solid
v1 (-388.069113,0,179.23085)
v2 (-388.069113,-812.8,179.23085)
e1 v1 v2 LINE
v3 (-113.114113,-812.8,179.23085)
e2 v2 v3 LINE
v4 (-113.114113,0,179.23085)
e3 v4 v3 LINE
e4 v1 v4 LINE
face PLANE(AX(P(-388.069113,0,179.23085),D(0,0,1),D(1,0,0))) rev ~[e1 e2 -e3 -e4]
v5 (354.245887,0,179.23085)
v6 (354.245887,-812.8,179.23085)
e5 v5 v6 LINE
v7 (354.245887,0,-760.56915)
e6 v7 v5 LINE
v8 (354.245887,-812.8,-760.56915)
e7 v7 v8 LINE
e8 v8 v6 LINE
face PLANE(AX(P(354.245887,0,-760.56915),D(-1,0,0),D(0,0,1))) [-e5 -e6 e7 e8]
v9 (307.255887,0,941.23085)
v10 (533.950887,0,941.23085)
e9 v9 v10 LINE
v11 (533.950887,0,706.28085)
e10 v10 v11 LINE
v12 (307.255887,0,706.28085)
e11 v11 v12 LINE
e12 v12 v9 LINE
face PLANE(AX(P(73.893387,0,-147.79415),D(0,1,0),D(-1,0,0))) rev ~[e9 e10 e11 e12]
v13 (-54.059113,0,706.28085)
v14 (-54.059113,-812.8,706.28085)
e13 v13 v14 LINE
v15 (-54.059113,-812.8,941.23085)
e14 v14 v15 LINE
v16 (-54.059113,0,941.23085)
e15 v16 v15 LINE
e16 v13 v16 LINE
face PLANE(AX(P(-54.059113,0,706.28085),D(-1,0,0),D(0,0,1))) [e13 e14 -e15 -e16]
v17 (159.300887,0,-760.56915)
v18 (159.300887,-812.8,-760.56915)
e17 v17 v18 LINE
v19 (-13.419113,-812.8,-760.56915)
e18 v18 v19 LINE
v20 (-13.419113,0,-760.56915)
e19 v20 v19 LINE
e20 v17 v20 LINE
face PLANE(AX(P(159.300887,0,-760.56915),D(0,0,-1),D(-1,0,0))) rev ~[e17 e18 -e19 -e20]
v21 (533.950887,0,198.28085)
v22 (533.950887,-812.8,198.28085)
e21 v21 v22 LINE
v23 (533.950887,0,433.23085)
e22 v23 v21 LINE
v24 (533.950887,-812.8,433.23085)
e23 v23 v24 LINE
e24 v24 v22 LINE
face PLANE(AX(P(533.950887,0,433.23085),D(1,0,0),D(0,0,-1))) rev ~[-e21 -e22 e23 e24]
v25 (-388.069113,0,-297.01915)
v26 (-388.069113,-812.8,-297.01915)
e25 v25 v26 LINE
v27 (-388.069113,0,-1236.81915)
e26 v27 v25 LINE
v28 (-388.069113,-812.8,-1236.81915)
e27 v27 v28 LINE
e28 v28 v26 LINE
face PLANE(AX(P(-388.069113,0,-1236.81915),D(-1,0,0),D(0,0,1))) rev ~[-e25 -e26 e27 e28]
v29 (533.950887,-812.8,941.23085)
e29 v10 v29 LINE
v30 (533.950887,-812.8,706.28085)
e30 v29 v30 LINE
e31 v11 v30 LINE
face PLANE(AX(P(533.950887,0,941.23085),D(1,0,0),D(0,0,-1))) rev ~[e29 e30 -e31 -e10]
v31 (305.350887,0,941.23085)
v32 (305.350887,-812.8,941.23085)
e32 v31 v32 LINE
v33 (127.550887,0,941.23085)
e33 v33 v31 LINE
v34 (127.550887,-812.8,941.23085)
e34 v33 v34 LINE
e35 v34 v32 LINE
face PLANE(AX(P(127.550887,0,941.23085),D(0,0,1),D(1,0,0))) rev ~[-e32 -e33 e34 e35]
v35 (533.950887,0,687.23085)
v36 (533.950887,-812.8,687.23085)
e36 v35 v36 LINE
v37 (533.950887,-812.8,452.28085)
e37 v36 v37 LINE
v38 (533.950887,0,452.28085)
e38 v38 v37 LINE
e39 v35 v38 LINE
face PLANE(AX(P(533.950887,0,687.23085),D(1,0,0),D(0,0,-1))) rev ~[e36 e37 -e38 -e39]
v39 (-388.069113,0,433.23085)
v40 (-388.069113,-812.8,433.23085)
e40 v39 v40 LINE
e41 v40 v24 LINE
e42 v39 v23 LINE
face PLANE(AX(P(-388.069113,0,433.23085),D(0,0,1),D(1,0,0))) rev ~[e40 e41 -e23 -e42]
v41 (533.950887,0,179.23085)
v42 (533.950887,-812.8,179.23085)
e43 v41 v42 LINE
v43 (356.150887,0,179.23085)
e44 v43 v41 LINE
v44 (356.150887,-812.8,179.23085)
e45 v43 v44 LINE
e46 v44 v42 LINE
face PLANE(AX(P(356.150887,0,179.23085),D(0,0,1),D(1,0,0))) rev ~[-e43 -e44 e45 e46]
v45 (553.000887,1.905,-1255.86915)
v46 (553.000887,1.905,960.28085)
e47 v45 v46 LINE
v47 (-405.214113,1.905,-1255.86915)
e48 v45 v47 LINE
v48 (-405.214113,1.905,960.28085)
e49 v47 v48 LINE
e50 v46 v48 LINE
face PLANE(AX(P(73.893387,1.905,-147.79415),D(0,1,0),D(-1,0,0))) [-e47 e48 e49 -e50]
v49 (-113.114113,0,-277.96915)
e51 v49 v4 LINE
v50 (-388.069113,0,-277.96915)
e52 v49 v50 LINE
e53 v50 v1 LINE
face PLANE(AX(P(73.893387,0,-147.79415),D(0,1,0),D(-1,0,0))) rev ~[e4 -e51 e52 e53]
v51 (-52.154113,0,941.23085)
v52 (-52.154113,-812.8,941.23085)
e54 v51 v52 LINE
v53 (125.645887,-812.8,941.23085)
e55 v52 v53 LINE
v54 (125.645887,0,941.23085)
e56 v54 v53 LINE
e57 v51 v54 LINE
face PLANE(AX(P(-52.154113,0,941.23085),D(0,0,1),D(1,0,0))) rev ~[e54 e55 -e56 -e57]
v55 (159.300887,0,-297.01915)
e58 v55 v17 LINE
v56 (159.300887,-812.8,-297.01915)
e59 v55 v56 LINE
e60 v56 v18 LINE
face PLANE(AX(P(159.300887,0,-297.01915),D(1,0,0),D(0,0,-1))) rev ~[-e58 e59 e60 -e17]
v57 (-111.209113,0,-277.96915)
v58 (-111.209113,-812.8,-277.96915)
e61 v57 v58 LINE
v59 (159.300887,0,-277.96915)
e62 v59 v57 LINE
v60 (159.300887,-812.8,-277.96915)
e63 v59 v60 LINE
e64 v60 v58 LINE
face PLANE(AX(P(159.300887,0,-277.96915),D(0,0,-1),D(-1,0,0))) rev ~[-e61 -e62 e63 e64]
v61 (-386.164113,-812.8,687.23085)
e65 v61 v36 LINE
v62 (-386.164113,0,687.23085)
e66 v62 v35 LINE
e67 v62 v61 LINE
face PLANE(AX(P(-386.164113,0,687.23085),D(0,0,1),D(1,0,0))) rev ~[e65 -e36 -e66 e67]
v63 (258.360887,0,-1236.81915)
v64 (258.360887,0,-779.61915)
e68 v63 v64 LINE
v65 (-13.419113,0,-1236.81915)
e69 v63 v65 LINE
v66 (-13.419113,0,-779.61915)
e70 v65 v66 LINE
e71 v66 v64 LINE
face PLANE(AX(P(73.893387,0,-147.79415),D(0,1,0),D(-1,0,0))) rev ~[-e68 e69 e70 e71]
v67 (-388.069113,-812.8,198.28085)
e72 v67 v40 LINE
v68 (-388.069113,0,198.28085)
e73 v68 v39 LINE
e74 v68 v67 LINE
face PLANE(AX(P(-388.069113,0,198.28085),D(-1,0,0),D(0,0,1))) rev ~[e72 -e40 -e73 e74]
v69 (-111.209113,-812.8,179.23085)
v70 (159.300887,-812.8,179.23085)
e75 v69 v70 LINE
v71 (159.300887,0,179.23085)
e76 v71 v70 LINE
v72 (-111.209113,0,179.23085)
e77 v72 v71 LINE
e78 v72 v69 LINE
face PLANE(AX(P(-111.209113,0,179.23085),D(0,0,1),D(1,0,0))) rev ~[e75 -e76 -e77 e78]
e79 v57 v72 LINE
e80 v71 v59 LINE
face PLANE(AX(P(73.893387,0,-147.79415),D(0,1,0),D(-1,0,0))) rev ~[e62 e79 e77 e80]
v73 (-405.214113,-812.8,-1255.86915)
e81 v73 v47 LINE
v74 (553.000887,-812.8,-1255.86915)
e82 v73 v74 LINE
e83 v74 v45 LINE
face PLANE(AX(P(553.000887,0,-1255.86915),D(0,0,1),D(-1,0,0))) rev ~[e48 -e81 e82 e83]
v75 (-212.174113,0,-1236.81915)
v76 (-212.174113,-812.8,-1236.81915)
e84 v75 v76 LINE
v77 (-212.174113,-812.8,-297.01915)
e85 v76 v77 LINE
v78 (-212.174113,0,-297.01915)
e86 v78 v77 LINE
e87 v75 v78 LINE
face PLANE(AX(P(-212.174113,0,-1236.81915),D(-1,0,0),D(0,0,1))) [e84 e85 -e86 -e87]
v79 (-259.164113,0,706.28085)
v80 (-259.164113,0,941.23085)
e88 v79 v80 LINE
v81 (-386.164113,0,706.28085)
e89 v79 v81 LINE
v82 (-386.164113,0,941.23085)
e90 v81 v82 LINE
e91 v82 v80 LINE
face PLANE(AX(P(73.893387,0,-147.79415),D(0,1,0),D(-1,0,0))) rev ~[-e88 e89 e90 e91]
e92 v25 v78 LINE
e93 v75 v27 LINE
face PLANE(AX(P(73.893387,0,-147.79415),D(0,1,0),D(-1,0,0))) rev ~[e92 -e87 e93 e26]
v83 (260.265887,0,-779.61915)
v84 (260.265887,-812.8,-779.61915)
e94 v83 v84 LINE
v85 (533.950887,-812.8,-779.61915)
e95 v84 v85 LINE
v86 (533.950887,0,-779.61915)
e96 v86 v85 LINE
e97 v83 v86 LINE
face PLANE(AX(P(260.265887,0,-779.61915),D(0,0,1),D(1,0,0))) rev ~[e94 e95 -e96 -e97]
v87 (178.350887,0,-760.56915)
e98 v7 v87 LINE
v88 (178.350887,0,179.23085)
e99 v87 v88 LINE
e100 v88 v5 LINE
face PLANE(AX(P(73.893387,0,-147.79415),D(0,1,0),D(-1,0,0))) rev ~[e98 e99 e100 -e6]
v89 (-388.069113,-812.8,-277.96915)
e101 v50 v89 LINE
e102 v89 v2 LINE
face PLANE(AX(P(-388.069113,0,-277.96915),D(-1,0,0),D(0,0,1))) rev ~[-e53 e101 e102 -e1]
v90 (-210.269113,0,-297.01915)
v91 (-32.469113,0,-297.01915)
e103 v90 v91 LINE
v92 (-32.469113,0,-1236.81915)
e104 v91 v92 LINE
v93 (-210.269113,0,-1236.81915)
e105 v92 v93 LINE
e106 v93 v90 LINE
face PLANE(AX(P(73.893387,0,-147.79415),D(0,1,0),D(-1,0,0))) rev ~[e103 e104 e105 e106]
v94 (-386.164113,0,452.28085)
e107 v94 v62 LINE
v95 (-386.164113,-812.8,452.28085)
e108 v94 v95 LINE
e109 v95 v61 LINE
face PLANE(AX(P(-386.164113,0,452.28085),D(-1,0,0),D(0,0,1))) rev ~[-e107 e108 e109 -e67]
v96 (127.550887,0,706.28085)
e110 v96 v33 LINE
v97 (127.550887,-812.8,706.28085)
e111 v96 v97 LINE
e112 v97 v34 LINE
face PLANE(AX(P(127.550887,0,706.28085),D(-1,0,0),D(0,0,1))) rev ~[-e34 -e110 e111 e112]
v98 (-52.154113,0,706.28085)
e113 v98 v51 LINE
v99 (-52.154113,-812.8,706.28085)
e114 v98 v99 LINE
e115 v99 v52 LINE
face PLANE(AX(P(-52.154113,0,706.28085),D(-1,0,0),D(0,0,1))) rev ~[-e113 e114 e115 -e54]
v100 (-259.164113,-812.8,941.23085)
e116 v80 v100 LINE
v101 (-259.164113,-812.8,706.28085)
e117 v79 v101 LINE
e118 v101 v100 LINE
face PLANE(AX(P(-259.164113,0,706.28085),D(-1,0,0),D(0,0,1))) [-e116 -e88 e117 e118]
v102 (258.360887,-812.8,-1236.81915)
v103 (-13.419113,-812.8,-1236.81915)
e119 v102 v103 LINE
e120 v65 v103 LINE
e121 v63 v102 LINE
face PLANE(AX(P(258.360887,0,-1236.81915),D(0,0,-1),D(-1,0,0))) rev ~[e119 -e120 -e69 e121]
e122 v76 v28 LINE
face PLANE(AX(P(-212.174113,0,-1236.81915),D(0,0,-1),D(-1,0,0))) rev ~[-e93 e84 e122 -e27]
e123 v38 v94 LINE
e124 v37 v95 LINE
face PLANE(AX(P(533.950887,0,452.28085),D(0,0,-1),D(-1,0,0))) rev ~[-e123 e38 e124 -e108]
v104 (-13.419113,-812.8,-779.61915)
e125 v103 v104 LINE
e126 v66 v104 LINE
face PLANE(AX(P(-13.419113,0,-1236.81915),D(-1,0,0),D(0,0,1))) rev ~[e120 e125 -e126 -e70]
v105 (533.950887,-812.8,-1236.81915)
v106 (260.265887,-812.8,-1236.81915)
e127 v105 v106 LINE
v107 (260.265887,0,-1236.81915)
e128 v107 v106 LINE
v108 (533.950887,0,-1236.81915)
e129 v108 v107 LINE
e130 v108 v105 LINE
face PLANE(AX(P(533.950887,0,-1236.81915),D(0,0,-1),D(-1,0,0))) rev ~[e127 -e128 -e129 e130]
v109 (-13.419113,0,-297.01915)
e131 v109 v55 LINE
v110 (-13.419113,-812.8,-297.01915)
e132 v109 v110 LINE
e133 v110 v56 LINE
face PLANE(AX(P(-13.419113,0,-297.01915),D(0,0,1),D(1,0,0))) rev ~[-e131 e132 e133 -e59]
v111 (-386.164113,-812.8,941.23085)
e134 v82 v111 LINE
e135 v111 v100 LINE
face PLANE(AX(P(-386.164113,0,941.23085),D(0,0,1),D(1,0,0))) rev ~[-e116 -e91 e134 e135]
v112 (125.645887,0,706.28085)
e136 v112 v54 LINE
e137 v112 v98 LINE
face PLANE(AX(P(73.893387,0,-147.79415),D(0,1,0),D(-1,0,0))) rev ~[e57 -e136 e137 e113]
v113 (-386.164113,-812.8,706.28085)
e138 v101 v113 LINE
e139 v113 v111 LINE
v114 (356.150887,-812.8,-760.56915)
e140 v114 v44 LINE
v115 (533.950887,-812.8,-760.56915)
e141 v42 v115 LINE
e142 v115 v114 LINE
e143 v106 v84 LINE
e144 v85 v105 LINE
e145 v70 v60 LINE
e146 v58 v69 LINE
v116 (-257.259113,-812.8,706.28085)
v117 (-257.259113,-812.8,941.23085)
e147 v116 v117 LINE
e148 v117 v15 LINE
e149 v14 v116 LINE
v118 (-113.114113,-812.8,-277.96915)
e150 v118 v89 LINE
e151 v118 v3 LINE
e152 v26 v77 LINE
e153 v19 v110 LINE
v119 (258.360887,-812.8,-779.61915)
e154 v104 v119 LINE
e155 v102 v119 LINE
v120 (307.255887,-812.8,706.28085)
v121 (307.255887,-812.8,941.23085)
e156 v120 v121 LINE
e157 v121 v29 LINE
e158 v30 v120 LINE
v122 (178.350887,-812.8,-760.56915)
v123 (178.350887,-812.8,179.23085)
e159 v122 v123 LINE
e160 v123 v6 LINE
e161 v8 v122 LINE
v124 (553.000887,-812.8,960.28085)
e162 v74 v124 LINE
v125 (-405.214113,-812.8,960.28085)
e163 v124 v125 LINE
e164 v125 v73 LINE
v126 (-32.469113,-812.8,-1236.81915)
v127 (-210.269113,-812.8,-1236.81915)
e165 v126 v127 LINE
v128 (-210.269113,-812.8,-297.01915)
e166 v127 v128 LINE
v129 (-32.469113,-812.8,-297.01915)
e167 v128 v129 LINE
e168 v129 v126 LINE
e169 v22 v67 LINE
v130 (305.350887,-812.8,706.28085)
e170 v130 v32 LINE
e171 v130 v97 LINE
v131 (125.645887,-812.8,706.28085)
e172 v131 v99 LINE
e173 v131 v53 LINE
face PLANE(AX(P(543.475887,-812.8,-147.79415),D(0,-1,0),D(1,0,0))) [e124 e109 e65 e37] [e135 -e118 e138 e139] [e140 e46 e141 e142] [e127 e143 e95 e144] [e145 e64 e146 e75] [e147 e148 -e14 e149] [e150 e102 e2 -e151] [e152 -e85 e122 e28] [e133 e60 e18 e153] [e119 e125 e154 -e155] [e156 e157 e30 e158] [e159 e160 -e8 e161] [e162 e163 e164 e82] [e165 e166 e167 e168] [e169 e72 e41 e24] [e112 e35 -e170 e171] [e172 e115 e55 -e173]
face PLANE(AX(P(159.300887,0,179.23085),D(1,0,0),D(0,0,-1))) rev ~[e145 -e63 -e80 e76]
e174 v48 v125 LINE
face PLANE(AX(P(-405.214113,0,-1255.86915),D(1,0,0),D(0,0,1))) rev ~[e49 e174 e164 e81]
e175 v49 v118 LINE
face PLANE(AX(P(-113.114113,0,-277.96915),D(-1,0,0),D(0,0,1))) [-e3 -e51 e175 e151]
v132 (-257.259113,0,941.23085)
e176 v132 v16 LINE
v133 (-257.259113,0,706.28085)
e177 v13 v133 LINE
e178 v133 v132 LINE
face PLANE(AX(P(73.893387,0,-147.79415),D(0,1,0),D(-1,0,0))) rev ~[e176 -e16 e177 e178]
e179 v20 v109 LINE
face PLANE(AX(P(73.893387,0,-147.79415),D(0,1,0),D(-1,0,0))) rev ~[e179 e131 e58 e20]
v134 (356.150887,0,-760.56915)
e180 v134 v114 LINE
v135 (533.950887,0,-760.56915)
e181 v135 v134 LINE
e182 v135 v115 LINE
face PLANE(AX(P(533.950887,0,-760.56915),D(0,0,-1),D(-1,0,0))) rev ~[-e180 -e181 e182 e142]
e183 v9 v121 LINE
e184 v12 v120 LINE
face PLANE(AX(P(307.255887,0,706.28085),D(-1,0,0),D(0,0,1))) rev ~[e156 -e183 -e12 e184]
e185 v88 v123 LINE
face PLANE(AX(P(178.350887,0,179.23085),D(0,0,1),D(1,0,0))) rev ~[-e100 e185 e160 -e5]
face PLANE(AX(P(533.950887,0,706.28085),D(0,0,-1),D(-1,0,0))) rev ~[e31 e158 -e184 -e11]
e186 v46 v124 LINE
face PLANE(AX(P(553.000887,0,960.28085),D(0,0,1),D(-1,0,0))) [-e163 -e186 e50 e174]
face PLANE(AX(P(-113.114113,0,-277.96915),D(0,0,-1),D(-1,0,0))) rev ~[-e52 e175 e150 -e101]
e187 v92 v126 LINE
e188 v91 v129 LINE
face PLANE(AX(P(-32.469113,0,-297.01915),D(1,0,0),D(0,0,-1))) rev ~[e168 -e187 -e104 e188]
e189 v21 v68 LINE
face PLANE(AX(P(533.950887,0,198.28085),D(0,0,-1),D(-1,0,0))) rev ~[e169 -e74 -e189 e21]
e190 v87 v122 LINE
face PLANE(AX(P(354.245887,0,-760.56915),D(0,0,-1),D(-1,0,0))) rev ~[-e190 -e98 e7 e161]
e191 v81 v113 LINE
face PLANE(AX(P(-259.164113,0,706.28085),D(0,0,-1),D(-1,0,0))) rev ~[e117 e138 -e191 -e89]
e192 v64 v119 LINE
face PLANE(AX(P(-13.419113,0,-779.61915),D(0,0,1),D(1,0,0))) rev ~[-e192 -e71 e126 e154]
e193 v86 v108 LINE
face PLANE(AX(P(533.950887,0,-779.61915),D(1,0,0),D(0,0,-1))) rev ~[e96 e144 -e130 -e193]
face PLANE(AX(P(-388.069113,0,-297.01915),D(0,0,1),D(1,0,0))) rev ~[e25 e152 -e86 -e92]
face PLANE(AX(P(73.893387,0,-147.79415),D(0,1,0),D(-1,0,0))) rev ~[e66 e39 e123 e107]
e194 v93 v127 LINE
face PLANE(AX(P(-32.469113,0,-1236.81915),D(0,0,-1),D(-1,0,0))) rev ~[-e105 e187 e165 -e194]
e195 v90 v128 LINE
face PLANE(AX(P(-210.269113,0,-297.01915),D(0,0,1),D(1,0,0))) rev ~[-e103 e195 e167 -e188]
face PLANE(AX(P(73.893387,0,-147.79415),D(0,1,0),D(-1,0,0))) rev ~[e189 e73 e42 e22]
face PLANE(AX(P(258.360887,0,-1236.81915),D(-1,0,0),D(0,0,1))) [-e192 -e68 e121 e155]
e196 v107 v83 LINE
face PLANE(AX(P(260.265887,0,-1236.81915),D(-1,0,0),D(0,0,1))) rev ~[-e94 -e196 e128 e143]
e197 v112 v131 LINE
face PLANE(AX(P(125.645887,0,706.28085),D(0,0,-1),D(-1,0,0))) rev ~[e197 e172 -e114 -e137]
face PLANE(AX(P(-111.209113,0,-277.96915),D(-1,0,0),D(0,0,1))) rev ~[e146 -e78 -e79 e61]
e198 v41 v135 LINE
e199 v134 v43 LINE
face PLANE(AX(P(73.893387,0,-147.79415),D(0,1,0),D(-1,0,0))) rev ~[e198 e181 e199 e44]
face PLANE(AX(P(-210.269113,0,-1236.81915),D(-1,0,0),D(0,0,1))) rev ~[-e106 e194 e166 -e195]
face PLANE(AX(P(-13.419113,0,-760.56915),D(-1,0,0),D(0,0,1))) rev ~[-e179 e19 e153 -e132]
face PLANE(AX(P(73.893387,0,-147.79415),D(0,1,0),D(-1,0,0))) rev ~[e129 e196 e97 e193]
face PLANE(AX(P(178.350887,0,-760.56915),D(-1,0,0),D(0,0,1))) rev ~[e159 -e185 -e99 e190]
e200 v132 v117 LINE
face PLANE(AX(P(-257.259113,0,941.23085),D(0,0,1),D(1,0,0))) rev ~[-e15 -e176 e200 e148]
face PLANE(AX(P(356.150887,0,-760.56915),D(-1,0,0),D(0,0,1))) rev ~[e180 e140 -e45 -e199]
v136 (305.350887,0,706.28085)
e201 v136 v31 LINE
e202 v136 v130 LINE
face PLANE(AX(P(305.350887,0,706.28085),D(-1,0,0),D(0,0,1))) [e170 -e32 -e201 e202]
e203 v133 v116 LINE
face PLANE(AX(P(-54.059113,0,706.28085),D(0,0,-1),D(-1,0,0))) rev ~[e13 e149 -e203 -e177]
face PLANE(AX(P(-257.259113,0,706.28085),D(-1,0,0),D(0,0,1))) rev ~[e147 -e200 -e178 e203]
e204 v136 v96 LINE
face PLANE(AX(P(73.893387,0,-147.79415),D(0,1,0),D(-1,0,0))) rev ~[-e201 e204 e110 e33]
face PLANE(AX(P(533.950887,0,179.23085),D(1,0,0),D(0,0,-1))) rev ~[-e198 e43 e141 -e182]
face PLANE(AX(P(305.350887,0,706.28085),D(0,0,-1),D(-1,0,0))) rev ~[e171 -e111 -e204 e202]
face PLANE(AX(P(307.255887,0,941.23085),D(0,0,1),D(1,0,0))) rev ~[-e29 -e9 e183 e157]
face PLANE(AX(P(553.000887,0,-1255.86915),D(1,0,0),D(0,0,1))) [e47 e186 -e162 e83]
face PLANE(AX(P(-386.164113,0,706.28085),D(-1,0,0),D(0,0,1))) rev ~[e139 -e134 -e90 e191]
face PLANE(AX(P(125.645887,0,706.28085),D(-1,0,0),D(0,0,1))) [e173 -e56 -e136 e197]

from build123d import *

# Parameters (mm, degrees)
F0_W     = 172.72
F0_H     = 19.05
F0_W_2   = 1.905
F0_H_2   = 939.8
F0_H_3   = 457.2
F0_H_4   = 234.95
F1_DEPTH = 812.8
F2_W     = 958.215
F2_H     = 2216.15
F3_DEPTH = 1.905


# Not quite as in the source:
# - a feature names something its author has since deleted; it is built from what else it names


with BuildPart() as f1:
    # F0 (on Front) → F1 (new body)
    with BuildSketch(Plane.XZ):
        Polygon((533.950886898, -1236.8191501617), (533.950886898, -1255.8691501617), (553.000886898, -1255.8691501617), (553.000886898, 960.2808498383), (533.950886898, 960.2808498383), (533.950886898, 941.2308498383), (533.950886898, 706.2808498383), (533.950886898, 687.2308498383), (533.950886898, 452.2808498383), (533.950886898, 433.2308498383), (533.950886898, 198.2808498383), (533.950886898, 179.2308498383), (533.950886898, -436.7191501617), (533.950886898, -760.5691501617), (533.950886898, -779.6191501617), align=None)
        Polygon((-212.174113102, -1236.8191501617), (-388.069113102, -1236.8191501617), (-388.069113102, -1255.8691501617), (-342.2091657827, -1255.8691501617), (532.045886898, -1255.8691501617), (533.950886898, -1255.8691501617), (533.950886898, -1236.8191501617), (532.045886898, -1236.8191501617), (260.265886898, -1236.8191501617), (258.360886898, -1236.8191501617), (-13.419113102, -1236.8191501617), (-32.469113102, -1236.8191501617), (-210.269113102, -1236.8191501617), align=None)
        Polygon((-388.069113102, -1255.8691501617), (-388.069113102, -1236.8191501617), (-388.069113102, -436.7191501617), (-388.069113102, -297.0191501617), (-388.069113102, -277.9691501617), (-388.069113102, 179.2308498383), (-388.069113102, 198.2808498383), (-388.069113102, 433.2308498383), (-388.069113102, 452.2808498383), (-386.164113102, 452.2808498383), (-386.164113102, 687.2308498383), (-386.164113102, 706.2808498383), (-386.164113102, 941.2308498383), (-259.164113102, 941.2308498383), (-257.259113102, 941.2308498383), (-54.059113102, 941.2308498383), (-52.154113102, 941.2308498383), (125.645886898, 941.2308498383), (127.550886898, 941.2308498383), (305.350886898, 941.2308498383), (307.255886898, 941.2308498383), (533.950886898, 941.2308498383), (533.950886898, 960.2808498383), (-282.659113102, 960.2808498383), (-405.214113102, 960.2808498383), (-405.214113102, -1255.8691501617), align=None)
        Polygon((-32.469113102, -297.0191501617), (-32.469113102, -1236.8191501617), (-13.419113102, -1236.8191501617), (-13.419113102, -779.6191501617), (-13.419113102, -760.5691501617), (-13.419113102, -297.0191501617), align=None)
        Polygon((-13.419113102, -760.5691501617), (-13.419113102, -779.6191501617), (258.360886898, -779.6191501617), (260.265886898, -779.6191501617), (533.950886898, -779.6191501617), (533.950886898, -760.5691501617), (356.150886898, -760.5691501617), (354.245886898, -760.5691501617), (178.350886898, -760.5691501617), (159.300886898, -760.5691501617), align=None)
        Polygon((159.300886898, -277.9691501617), (159.300886898, -297.0191501617), (159.300886898, -760.5691501617), (178.350886898, -760.5691501617), (178.350886898, 179.2308498383), (159.300886898, 179.2308498383), align=None)
        with Locations((72.940886898, -287.4941501617)):
            Rectangle(F0_W, F0_H)
        Polygon((-388.069113102, -297.0191501617), (-212.174113102, -297.0191501617), (-210.269113102, -297.0191501617), (-32.469113102, -297.0191501617), (-13.419113102, -297.0191501617), (-13.419113102, -277.9691501617), (-111.209113102, -277.9691501617), (-113.114113102, -277.9691501617), (-388.069113102, -277.9691501617), align=None)
        Polygon((-388.069113102, 198.2808498383), (-388.069113102, 179.2308498383), (-113.114113102, 179.2308498383), (-111.209113102, 179.2308498383), (159.300886898, 179.2308498383), (159.300886898, 198.2808498383), align=None)
        Polygon((533.950886898, 198.2808498383), (159.300886898, 198.2808498383), (159.300886898, 179.2308498383), (178.350886898, 179.2308498383), (354.245886898, 179.2308498383), (356.150886898, 179.2308498383), (533.950886898, 179.2308498383), align=None)
        Polygon((-388.069113102, 452.2808498383), (-388.069113102, 433.2308498383), (533.950886898, 433.2308498383), (533.950886898, 452.2808498383), (-386.164113102, 452.2808498383), align=None)
        Polygon((533.950886898, 687.2308498383), (533.950886898, 706.2808498383), (307.255886898, 706.2808498383), (305.350886898, 706.2808498383), (127.550886898, 706.2808498383), (125.645886898, 706.2808498383), (-52.154113102, 706.2808498383), (-54.059113102, 706.2808498383), (-257.259113102, 706.2808498383), (-259.164113102, 706.2808498383), (-386.164113102, 706.2808498383), (-386.164113102, 687.2308498383), align=None)
        with Locations((355.198386898, -290.6691501617)):
            Rectangle(F0_W_2, F0_H_2)
        with Locations((-112.161613102, -49.3691501617)):
            Rectangle(F0_W_2, F0_H_3)
        with Locations((-211.221613102, -766.9191501617)):
            Rectangle(F0_W_2, F0_H_2)
        with Locations((259.313386898, -1008.2191501617)):
            Rectangle(F0_W_2, F0_H_3)
        with Locations((-258.211613102, 823.7558498383)):
            Rectangle(F0_W_2, F0_H_4)
        with Locations((-53.106613102, 823.7558498383)):
            Rectangle(F0_W_2, F0_H_4)
        with Locations((126.598386898, 823.7558498383)):
            Rectangle(F0_W_2, F0_H_4)
        with Locations((306.303386898, 823.7558498383)):
            Rectangle(F0_W_2, F0_H_4)
    extrude(amount=F1_DEPTH)

    # F2 (on face) → F3 (join)
    with BuildSketch(Plane(origin=(0, 0, 0), x_dir=(-1, 0, 0), z_dir=(0, 1, 0))):
        with Locations((-73.893386898, -147.7941501617)):
            Rectangle(F2_W, F2_H)
    extrude(amount=F3_DEPTH)


solid = f1.part
